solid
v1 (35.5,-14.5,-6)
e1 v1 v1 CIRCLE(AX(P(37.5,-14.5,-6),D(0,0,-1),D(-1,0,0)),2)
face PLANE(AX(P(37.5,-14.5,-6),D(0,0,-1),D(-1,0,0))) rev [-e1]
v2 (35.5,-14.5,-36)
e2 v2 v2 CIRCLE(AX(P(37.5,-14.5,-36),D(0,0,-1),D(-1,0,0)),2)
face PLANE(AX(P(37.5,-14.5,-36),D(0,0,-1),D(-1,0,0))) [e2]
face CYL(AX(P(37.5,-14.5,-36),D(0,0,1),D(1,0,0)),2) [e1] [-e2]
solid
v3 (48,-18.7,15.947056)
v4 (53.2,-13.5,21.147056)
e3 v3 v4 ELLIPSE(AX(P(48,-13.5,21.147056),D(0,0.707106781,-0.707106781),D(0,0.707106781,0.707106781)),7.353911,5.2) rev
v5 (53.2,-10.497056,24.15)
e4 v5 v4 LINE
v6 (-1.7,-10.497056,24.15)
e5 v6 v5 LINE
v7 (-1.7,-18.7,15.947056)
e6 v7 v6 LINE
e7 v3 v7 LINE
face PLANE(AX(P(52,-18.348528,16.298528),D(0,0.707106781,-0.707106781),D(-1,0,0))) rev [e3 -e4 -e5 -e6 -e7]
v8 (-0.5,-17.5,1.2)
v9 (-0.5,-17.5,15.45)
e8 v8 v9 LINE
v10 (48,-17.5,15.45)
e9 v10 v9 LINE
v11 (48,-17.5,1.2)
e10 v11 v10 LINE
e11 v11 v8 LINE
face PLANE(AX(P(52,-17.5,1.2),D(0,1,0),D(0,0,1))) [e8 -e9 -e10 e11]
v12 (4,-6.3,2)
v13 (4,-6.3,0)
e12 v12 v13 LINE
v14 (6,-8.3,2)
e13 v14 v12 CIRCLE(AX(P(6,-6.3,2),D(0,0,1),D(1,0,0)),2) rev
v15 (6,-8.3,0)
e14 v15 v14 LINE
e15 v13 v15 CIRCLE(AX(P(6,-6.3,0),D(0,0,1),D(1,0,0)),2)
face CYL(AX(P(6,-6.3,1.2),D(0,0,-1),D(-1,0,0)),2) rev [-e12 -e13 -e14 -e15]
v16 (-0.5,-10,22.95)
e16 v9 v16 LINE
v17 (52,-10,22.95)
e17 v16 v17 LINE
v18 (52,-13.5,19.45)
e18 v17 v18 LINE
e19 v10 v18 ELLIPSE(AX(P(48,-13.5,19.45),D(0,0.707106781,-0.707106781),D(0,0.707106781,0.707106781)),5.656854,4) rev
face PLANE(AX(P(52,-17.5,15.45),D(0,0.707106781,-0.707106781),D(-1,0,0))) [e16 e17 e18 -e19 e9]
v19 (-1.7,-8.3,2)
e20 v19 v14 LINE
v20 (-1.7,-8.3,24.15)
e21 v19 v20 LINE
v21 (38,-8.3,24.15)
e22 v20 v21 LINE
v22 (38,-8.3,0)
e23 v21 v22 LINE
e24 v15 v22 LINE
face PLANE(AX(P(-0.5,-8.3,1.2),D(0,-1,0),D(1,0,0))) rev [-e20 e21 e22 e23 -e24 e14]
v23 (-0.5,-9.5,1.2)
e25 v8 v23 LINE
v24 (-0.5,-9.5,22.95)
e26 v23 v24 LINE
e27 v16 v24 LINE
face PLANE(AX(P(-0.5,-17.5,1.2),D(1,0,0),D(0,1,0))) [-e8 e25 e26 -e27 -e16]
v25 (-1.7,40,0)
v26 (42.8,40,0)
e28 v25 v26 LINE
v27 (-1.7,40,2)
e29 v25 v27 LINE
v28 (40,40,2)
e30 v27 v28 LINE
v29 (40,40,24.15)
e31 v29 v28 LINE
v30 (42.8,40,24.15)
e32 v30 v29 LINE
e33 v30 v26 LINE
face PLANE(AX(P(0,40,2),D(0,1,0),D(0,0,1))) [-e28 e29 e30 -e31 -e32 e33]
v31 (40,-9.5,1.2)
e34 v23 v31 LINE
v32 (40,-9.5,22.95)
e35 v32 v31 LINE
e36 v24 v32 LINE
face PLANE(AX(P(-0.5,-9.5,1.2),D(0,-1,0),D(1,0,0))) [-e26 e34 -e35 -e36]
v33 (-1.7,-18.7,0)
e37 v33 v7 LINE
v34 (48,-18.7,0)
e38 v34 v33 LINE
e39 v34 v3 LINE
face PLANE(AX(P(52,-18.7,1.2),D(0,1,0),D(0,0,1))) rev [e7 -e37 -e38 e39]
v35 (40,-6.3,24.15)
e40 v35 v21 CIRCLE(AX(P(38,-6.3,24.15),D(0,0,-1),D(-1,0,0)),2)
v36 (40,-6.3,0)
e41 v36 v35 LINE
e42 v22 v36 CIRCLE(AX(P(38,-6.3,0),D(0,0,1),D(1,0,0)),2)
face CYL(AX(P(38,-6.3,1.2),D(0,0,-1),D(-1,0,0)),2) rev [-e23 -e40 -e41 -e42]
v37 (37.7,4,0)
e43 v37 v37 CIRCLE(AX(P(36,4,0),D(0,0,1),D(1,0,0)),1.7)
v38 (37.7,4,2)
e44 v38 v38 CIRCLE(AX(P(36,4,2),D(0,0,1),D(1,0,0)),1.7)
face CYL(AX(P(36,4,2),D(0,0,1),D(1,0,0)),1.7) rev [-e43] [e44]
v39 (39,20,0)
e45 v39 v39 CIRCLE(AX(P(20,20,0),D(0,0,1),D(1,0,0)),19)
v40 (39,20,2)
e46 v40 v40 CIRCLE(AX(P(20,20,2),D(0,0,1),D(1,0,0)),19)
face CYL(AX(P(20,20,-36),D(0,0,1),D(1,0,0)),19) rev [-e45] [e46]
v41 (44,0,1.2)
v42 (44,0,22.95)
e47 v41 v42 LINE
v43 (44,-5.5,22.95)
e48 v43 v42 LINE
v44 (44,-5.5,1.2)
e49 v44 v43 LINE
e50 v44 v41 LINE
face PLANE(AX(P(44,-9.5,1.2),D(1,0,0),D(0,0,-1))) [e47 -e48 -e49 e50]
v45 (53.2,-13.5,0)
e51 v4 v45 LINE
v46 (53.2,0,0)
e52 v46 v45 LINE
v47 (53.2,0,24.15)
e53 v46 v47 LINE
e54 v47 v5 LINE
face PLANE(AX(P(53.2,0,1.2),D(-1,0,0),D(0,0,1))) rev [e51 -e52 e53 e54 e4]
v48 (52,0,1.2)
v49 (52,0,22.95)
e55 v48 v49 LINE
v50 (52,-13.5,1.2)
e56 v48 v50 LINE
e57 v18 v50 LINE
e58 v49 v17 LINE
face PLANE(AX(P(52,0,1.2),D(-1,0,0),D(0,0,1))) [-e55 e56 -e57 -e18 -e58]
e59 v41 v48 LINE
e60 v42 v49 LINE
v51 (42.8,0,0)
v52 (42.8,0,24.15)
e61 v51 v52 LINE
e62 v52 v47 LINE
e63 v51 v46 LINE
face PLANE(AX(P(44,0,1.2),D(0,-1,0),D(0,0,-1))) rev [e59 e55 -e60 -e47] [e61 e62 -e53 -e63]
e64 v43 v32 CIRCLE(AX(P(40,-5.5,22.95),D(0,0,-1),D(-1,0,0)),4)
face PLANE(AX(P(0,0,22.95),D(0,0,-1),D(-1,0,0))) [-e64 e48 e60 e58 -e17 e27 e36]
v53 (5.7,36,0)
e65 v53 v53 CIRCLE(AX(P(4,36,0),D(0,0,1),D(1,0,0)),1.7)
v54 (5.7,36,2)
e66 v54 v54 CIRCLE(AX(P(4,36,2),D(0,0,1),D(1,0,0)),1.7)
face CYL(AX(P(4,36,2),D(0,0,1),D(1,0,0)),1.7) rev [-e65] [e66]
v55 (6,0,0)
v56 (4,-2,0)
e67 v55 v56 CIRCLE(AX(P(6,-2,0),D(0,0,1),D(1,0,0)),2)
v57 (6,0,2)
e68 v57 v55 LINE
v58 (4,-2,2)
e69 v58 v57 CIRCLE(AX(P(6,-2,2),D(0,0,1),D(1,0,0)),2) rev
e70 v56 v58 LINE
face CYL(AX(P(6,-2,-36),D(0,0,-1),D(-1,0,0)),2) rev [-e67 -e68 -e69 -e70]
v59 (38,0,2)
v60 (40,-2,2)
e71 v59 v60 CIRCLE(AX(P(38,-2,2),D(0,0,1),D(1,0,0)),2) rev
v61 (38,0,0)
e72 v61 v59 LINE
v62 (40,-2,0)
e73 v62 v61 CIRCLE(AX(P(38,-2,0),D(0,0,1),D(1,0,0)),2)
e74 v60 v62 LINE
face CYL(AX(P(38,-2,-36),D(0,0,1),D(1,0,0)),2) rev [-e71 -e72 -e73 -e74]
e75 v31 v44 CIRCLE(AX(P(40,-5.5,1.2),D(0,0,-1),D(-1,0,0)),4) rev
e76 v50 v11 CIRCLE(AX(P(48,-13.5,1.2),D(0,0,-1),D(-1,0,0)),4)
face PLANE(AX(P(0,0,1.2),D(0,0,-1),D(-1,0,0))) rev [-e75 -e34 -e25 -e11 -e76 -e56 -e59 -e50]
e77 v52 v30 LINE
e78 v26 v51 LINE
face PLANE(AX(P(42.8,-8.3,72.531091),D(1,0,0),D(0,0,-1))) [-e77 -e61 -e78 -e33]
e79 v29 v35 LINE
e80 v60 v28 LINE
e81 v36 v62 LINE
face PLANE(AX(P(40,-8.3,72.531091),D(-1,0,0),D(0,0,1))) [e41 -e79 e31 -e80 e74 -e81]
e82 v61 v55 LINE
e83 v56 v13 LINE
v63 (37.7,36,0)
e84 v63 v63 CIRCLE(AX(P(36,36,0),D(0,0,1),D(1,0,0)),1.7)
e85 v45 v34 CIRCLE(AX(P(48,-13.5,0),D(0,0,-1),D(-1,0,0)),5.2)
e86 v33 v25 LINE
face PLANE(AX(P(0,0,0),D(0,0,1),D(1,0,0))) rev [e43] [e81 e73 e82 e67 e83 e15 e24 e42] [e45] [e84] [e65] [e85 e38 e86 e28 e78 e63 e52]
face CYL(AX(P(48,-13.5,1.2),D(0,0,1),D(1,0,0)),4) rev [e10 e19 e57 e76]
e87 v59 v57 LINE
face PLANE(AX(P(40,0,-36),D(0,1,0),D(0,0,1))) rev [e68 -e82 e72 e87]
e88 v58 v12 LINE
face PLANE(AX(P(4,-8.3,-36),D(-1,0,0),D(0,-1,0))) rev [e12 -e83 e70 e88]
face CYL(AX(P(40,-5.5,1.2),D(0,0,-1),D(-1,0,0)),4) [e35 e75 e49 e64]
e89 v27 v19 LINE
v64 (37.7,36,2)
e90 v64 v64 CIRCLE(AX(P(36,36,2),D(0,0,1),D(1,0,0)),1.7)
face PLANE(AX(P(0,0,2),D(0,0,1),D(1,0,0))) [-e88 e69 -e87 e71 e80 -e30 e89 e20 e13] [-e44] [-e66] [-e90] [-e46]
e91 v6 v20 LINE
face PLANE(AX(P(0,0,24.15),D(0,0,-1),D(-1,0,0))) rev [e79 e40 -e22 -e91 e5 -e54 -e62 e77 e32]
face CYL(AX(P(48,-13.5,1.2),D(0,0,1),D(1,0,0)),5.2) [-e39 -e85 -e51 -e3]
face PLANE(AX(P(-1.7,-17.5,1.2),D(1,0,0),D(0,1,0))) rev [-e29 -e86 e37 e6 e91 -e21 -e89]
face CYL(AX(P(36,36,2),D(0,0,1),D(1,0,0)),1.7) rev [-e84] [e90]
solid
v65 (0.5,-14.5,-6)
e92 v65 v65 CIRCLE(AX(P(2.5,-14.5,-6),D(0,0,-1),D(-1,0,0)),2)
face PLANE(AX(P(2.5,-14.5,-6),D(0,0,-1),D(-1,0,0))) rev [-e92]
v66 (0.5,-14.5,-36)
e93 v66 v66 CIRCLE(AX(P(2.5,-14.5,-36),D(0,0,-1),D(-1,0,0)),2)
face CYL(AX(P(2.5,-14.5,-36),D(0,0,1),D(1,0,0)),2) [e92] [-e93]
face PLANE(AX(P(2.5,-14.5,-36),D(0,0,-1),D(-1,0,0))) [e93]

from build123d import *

# Parameters (mm, degrees)
SKETCH1_W              = 40
SKETCH1_H              = 40
BOSS_EXTRUDE1_DEPTH    = 2
M3_CLEARANCE_HOLE1_D   = 3.4
SKETCH10_W             = 40
SKETCH10_H             = 8.3
BOSS_EXTRUDE7_DEPTH    = 2
BOSS_EXTRUDE10_START   = 6
SKETCH20_R             = 2
BOSS_EXTRUDE10_DEPTH   = 30
BOSS_EXTRUDE10_2_DEPTH = 30
BOSS_EXTRUDE11_DEPTH   = 21.75
CHAMFER1_SIZE          = 7.5
FILLET1_R              = 4
SHELL1_T               = 1.2
SKETCH25_W             = 2.8
SKETCH25_H             = 48.3
BOSS_EXTRUDE14_DEPTH   = 24.15
SKETCH26_W             = 36
SKETCH26_H             = 8.3
CUT_EXTRUDE5_DEPTH     = 77.64359073
SKETCH27_R             = 19
CUT_EXTRUDE6_DEPTH     = 77.64359073
FILLET2_R              = 2
FILLET3_R              = 2
SKETCH29_W             = 1.7
SKETCH29_H             = 48.3
BOSS_EXTRUDE15_DEPTH   = 2
DELETEFACE1_OUTLINE_R  = 1.7
DELETEFACE1_DEPTH      = 2


# Read off the part's stored shape, not the designer's step: DeleteFace1
with BuildPart() as part:
    # Sketch1 → Boss-Extrude1 (new body)
    with BuildSketch(Plane.XY):
        with Locations((20, 20)):
            Rectangle(SKETCH1_W, SKETCH1_H)
    extrude(amount=BOSS_EXTRUDE1_DEPTH)

    # M3 Clearance Hole1 (through all)
    with Locations(Plane.XY.offset(2)):
        with Locations((4, 36), (36, 4), (4, 4), (36, 36)):
            Hole(M3_CLEARANCE_HOLE1_D / 2)

    # Sketch10 → Boss-Extrude7 (add)
    with BuildSketch(Plane.XY.offset(2)):
        with Locations((20, -4.15)):
            Rectangle(SKETCH10_W, SKETCH10_H)
    extrude(amount=-BOSS_EXTRUDE7_DEPTH)



with BuildPart() as body_2:
    # Sketch20 → Boss-Extrude10 (new body)
    with BuildSketch(Plane(origin=(0, 0, 0), x_dir=(-1, 0, 0), z_dir=(0, 0, -1)).offset(BOSS_EXTRUDE10_START)):
        with Locations((-37.5, -14.5)):
            Circle(SKETCH20_R)
    extrude(amount=BOSS_EXTRUDE10_DEPTH)


with BuildPart() as body_3:
    # Sketch20 → Boss-Extrude10 2 (new body)
    with BuildSketch(Plane(origin=(0, 0, 0), x_dir=(-1, 0, 0), z_dir=(0, 0, -1)).offset(BOSS_EXTRUDE10_START)):
        with Locations((-2.5, -14.5)):
            Circle(SKETCH20_R)
    extrude(amount=BOSS_EXTRUDE10_2_DEPTH)


with BuildPart() as body_4:
    # Sketch22 → Boss-Extrude11 (new body)
    with BuildSketch(Plane(origin=(0, 0, 22.95), x_dir=(-1, 0, 0), z_dir=(0, 0, -1))):
        Polygon((-44, 0), (-52, 0), (-52, -17.5), (0.5, -17.5), (0.5, -9.5), (-44, -9.5), align=None)
    extrude(amount=BOSS_EXTRUDE11_DEPTH)

    # Chamfer1
    chamfer1_edges = [body_4.edges().sort_by_distance(p)[0] for p in [
        (25.75, -17.5, 22.95),
    ]]
    chamfer(chamfer1_edges, length=CHAMFER1_SIZE)

    # Fillet1
    fillet1_edges = [body_4.edges().sort_by_distance(p)[0] for p in [
        (44, -9.5, 12.075),
        (52, -17.5, 8.325),
    ]]
    fillet(fillet1_edges, radius=FILLET1_R)

    # Shell1
    shell1_openings = [body_4.faces().sort_by_distance(p)[0] for p in [
        (48, 0, 12.075),
    ]]
    offset(amount=SHELL1_T, openings=shell1_openings, kind=Kind.INTERSECTION)


with BuildPart() as part_1:
    add(part.part)

    add(body_4.part)  # Boss-Extrude14 merges body 4
    # Sketch25 → Boss-Extrude14 (add)
    with BuildSketch(Plane(origin=(0, 0, 0), x_dir=(-1, 0, 0), z_dir=(0, 0, -1))):
        with Locations((-41.4, 15.85)):
            Rectangle(SKETCH25_W, SKETCH25_H)
    extrude(amount=-BOSS_EXTRUDE14_DEPTH)

    # Sketch26 → Cut-Extrude5 (cut, through all)
    with BuildSketch(Plane.XY.offset(2)):
        with Locations((22, -4.15)):
            Rectangle(SKETCH26_W, SKETCH26_H)
    extrude(amount=-CUT_EXTRUDE5_DEPTH, mode=Mode.SUBTRACT)

    # Sketch27 → Cut-Extrude6 (cut, through all)
    with BuildSketch(Plane.XY.offset(2)):
        with Locations((20, 20)):
            Circle(SKETCH27_R)
    extrude(amount=-CUT_EXTRUDE6_DEPTH, mode=Mode.SUBTRACT)

    # Fillet2
    fillet2_edges = [part_1.edges().sort_by_distance(p)[0] for p in [
        (4, 0, 1),
        (40, 0, 1),
        (4, -8.3, 1),
    ]]
    fillet(fillet2_edges, radius=FILLET2_R)

    # Fillet3
    fillet3_edges = [part_1.edges().sort_by_distance(p)[0] for p in [
        (40, -8.3, 12.075),
    ]]
    fillet(fillet3_edges, radius=FILLET3_R)

    # Sketch29 → Boss-Extrude15 (add)
    with BuildSketch(Plane.XY.offset(2)):
        with Locations((-0.85, 15.85)):
            Rectangle(SKETCH29_W, SKETCH29_H)
    extrude(amount=-BOSS_EXTRUDE15_DEPTH)

    # DeleteFace1 outline → DeleteFace1 (add)
    with BuildSketch(Plane.XY):
        with Locations((4, 4)):
            Circle(DELETEFACE1_OUTLINE_R)
    extrude(amount=DELETEFACE1_DEPTH)


solid = Compound([body_2.part, body_3.part, part_1.part])
